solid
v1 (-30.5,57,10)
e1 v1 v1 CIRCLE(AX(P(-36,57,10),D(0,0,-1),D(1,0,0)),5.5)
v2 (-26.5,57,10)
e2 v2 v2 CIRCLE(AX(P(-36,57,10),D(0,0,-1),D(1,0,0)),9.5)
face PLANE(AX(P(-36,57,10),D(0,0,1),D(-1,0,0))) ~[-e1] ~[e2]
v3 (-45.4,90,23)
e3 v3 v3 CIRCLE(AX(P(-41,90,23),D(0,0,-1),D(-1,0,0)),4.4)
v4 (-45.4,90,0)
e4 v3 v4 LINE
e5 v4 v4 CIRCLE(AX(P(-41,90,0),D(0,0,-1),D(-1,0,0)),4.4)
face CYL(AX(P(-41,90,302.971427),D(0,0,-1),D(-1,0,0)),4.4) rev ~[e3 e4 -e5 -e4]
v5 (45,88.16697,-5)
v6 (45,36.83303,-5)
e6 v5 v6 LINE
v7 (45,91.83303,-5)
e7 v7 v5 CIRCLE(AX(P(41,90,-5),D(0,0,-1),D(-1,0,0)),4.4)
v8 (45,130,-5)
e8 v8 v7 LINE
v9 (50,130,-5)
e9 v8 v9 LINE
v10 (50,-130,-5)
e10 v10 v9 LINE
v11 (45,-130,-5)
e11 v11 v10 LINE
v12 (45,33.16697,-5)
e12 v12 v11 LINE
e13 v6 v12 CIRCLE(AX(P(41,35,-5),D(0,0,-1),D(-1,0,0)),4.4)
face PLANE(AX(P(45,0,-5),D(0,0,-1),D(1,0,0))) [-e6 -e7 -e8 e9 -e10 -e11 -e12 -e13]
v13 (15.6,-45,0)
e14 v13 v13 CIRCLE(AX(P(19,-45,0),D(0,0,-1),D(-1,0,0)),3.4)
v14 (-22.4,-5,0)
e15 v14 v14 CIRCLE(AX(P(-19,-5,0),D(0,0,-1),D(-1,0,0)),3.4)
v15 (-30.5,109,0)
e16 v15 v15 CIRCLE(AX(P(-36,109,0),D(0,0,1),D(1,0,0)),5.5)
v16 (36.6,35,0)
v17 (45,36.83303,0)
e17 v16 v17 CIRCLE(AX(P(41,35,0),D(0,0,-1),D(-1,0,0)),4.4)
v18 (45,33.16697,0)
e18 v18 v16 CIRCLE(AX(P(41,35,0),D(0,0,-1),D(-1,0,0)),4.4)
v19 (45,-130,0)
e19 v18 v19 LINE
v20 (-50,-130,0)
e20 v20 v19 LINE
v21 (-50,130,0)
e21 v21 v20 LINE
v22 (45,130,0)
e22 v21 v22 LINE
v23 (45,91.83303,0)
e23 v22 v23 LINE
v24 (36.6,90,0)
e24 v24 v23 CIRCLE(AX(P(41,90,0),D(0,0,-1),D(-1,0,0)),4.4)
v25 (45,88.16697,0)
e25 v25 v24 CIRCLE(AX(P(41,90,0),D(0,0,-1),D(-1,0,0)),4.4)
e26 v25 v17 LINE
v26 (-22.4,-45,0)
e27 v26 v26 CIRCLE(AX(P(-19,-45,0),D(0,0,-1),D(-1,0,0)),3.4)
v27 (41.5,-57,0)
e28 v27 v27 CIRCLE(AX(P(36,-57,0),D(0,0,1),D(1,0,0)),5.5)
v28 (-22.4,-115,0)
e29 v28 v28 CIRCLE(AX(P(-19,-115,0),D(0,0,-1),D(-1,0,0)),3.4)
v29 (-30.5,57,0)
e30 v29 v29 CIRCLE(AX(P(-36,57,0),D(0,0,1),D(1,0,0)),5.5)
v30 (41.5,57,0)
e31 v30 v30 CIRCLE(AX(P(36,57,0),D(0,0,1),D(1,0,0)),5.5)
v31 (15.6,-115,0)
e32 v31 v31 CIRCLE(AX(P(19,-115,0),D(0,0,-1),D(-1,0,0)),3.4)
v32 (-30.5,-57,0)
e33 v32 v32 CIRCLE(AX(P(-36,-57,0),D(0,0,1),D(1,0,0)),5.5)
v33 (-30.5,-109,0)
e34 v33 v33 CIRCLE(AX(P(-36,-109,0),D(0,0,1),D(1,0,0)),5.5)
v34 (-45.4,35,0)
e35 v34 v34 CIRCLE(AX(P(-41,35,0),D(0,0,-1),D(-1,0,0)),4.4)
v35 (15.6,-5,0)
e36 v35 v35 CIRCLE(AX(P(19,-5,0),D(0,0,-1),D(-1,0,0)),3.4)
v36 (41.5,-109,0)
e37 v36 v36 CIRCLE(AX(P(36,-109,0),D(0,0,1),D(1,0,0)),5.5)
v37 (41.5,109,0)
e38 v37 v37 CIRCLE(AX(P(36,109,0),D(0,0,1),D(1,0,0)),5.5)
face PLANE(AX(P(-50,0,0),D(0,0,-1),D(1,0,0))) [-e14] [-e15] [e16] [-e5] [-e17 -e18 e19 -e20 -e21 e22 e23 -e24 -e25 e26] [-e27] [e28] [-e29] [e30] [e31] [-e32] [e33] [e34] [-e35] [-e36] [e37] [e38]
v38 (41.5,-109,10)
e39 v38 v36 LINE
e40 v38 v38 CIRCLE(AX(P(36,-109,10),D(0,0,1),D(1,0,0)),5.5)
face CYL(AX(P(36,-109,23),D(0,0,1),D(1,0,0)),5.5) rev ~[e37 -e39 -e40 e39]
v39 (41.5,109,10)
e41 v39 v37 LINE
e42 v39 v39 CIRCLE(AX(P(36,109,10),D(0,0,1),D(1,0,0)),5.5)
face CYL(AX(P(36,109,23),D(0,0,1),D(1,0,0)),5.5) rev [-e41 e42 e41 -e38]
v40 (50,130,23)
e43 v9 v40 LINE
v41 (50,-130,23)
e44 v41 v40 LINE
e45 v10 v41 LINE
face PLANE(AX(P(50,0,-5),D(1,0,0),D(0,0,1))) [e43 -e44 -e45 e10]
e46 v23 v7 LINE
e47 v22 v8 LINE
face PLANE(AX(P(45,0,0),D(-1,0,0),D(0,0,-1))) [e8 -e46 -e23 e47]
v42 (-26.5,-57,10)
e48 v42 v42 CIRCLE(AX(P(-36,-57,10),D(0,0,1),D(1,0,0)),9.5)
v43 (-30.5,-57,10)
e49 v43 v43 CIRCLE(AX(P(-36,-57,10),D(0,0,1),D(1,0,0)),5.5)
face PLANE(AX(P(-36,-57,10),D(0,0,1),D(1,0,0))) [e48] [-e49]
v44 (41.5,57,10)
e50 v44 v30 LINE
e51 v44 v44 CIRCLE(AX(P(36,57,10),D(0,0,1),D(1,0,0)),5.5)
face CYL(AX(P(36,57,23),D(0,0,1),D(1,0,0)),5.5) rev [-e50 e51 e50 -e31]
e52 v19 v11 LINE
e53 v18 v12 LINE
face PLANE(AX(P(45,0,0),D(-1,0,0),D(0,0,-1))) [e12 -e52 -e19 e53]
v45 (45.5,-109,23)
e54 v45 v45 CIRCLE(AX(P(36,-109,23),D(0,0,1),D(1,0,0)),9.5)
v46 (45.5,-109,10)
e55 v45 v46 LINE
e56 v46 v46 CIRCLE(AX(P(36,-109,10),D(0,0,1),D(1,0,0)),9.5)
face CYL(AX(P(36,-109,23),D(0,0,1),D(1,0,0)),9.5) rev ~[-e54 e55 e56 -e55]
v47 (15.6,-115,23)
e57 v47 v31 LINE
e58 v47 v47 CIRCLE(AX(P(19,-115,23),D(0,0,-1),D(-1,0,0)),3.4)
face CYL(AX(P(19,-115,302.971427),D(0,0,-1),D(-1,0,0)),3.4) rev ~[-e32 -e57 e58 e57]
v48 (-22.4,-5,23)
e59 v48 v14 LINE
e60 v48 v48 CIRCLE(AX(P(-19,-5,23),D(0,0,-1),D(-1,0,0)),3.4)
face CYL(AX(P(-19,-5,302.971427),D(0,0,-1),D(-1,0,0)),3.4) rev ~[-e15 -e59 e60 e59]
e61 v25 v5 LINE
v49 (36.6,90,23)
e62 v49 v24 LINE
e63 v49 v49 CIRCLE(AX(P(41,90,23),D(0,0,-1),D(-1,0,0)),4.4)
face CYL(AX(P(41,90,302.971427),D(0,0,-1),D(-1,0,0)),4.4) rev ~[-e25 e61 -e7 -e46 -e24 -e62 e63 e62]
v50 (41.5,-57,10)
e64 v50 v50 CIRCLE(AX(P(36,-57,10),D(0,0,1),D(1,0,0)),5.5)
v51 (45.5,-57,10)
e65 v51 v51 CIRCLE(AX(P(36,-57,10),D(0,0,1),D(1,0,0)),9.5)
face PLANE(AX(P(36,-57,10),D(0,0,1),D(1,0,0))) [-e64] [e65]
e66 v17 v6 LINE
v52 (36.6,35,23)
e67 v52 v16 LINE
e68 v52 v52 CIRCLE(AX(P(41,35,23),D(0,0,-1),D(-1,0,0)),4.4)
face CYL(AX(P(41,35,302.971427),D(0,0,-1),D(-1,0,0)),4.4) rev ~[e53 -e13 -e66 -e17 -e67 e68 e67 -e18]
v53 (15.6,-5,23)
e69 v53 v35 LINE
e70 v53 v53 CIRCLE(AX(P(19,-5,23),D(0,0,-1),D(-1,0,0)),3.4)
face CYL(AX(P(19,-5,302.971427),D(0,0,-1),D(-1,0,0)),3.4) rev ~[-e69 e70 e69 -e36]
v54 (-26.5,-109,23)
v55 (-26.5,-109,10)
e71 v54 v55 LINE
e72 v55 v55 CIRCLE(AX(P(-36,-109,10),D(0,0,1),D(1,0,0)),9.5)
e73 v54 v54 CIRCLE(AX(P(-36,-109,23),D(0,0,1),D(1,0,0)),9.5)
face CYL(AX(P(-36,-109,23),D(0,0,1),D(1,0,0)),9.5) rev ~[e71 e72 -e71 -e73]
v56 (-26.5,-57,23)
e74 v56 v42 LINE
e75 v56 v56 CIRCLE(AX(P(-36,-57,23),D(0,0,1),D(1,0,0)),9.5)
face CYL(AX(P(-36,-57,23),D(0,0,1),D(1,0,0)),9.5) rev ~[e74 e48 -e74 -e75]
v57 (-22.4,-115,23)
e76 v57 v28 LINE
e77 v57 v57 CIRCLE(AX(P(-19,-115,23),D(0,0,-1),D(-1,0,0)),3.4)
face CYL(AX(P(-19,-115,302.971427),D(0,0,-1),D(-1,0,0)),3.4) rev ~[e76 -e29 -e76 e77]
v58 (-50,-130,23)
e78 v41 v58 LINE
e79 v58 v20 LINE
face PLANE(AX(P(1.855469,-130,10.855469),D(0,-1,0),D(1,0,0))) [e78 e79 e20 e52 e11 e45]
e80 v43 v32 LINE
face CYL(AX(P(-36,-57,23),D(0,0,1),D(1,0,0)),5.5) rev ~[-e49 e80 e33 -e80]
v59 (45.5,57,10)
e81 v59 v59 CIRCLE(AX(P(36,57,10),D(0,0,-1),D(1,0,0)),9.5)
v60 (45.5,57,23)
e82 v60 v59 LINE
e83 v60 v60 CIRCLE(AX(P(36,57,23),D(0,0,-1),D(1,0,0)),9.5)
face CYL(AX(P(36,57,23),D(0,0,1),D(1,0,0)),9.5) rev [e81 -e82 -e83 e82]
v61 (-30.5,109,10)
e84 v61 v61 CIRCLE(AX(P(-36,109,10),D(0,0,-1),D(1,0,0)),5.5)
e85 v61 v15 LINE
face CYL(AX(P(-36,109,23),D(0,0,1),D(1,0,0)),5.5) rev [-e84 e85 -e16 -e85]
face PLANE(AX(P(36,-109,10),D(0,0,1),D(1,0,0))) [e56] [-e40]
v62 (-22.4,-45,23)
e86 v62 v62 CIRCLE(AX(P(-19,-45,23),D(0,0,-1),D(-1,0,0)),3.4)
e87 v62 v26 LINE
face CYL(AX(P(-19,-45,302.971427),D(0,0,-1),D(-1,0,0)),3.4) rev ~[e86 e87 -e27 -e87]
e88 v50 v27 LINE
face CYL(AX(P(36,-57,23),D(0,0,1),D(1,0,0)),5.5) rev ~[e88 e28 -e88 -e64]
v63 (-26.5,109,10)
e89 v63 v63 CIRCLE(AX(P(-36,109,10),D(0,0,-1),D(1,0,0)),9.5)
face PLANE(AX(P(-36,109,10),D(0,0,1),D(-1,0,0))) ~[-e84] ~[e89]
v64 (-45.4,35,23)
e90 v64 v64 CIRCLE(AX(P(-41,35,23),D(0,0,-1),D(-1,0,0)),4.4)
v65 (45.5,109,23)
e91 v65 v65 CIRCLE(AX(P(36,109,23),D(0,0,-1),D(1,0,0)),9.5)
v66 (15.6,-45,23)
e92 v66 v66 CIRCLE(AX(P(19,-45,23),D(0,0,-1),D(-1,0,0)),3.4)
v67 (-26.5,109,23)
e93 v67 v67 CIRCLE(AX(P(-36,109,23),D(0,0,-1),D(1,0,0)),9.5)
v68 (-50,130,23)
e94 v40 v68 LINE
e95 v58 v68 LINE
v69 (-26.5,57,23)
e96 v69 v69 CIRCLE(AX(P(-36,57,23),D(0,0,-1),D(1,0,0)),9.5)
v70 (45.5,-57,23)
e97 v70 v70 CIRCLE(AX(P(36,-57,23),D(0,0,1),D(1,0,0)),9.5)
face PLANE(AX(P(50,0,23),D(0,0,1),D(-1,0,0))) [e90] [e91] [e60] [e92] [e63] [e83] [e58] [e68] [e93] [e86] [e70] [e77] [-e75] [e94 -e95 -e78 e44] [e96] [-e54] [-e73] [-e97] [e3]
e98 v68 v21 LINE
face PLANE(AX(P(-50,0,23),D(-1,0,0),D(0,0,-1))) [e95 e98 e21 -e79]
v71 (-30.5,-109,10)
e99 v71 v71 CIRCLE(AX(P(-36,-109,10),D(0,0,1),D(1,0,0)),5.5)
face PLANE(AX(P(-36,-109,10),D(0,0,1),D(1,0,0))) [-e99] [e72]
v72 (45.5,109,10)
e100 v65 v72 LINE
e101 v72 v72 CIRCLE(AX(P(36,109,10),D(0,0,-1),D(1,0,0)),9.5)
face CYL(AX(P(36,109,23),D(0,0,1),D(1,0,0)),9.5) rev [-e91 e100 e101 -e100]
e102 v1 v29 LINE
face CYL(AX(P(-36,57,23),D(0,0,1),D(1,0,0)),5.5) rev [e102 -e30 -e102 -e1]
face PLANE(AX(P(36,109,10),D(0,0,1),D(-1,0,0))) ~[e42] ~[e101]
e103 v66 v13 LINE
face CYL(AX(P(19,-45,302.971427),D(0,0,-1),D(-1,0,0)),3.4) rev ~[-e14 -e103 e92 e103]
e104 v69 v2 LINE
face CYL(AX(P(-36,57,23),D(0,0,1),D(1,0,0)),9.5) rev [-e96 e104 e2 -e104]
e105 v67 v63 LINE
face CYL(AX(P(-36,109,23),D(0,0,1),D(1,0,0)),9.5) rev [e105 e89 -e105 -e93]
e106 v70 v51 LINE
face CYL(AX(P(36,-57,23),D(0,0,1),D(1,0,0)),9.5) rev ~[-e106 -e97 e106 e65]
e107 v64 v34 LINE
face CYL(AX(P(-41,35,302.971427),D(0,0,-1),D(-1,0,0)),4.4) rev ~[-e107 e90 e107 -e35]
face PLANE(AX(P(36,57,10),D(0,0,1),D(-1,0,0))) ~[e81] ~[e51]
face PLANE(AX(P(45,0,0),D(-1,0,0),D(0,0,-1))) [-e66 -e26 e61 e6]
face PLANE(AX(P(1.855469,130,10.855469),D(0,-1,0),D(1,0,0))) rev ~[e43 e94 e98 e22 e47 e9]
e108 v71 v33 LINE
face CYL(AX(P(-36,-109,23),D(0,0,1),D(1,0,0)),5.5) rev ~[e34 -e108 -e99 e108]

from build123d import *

# Parameters (mm, degrees)
F1_DEPTH = 130
F2_R     = 5.5
F3_DEPTH = 25
F2_R_2   = 9.5
F4_DEPTH = 13
F6_D     = 6.8
F7_D     = 8.8


# Not quite as in the source:
# - a pattern or mirror of a feature is missing from the dataset's text; its kind, count and spacing are read off the source's solid


with BuildPart() as f1:
    # F0 (on Front) → F1 (new body, symmetric)
    with BuildSketch(Plane.XZ):
        Polygon((-50, 23), (-50, 0), (45, 0), (45, -5), (50, -5), (50, 23), align=None)
    extrude(amount=F1_DEPTH, both=True)

    # F2 (on face) → F3 (cut)
    with BuildSketch(Plane.XY.offset(23)):
        with Locations((-36, -109)):
            Circle(F2_R)
        with Locations((36, -109)):
            Circle(F2_R)
        with Locations((-36, -57)):
            Circle(F2_R)
        with Locations((36, -57)):
            Circle(F2_R)
    f3 = extrude(amount=-F3_DEPTH, mode=Mode.SUBTRACT)

    # F3_copies: F3 across plane
    add(f3.mirror(Plane.ZX), mode=Mode.SUBTRACT)

    # F2 (on face) → F4 (cut)
    with BuildSketch(Plane.XY.offset(23)):
        with Locations((-36, -109)):
            Circle(F2_R_2)
        with Locations((-36, -109)):
            Circle(F2_R, mode=Mode.SUBTRACT)
        with Locations((36, -109)):
            Circle(F2_R_2)
        with Locations((36, -109)):
            Circle(F2_R, mode=Mode.SUBTRACT)
        with Locations((36, -109)):
            Circle(F2_R)
        with Locations((-36, -57)):
            Circle(F2_R_2)
        with Locations((-36, -57)):
            Circle(F2_R, mode=Mode.SUBTRACT)
        with Locations((36, -57)):
            Circle(F2_R_2)
        with Locations((36, -57)):
            Circle(F2_R, mode=Mode.SUBTRACT)
        with Locations((36, -57)):
            Circle(F2_R)
    f4 = extrude(amount=-F4_DEPTH, mode=Mode.SUBTRACT)

    # F4_copies: F4 across plane
    add(f4.mirror(Plane.ZX), mode=Mode.SUBTRACT)

    # F6 (through all)
    with Locations(Plane.XY.offset(23)):
        with Locations((-19, -115), (19, -115), (-19, -45), (19, -45), (19, -5), (-19, -5)):
            Hole(F6_D / 2)

    # F7 (through all)
    with Locations(Plane.XY.offset(23)):
        with Locations((-41, 35), (41, 35), (41, 90), (-41, 90)):
            Hole(F7_D / 2)


solid = f1.part
